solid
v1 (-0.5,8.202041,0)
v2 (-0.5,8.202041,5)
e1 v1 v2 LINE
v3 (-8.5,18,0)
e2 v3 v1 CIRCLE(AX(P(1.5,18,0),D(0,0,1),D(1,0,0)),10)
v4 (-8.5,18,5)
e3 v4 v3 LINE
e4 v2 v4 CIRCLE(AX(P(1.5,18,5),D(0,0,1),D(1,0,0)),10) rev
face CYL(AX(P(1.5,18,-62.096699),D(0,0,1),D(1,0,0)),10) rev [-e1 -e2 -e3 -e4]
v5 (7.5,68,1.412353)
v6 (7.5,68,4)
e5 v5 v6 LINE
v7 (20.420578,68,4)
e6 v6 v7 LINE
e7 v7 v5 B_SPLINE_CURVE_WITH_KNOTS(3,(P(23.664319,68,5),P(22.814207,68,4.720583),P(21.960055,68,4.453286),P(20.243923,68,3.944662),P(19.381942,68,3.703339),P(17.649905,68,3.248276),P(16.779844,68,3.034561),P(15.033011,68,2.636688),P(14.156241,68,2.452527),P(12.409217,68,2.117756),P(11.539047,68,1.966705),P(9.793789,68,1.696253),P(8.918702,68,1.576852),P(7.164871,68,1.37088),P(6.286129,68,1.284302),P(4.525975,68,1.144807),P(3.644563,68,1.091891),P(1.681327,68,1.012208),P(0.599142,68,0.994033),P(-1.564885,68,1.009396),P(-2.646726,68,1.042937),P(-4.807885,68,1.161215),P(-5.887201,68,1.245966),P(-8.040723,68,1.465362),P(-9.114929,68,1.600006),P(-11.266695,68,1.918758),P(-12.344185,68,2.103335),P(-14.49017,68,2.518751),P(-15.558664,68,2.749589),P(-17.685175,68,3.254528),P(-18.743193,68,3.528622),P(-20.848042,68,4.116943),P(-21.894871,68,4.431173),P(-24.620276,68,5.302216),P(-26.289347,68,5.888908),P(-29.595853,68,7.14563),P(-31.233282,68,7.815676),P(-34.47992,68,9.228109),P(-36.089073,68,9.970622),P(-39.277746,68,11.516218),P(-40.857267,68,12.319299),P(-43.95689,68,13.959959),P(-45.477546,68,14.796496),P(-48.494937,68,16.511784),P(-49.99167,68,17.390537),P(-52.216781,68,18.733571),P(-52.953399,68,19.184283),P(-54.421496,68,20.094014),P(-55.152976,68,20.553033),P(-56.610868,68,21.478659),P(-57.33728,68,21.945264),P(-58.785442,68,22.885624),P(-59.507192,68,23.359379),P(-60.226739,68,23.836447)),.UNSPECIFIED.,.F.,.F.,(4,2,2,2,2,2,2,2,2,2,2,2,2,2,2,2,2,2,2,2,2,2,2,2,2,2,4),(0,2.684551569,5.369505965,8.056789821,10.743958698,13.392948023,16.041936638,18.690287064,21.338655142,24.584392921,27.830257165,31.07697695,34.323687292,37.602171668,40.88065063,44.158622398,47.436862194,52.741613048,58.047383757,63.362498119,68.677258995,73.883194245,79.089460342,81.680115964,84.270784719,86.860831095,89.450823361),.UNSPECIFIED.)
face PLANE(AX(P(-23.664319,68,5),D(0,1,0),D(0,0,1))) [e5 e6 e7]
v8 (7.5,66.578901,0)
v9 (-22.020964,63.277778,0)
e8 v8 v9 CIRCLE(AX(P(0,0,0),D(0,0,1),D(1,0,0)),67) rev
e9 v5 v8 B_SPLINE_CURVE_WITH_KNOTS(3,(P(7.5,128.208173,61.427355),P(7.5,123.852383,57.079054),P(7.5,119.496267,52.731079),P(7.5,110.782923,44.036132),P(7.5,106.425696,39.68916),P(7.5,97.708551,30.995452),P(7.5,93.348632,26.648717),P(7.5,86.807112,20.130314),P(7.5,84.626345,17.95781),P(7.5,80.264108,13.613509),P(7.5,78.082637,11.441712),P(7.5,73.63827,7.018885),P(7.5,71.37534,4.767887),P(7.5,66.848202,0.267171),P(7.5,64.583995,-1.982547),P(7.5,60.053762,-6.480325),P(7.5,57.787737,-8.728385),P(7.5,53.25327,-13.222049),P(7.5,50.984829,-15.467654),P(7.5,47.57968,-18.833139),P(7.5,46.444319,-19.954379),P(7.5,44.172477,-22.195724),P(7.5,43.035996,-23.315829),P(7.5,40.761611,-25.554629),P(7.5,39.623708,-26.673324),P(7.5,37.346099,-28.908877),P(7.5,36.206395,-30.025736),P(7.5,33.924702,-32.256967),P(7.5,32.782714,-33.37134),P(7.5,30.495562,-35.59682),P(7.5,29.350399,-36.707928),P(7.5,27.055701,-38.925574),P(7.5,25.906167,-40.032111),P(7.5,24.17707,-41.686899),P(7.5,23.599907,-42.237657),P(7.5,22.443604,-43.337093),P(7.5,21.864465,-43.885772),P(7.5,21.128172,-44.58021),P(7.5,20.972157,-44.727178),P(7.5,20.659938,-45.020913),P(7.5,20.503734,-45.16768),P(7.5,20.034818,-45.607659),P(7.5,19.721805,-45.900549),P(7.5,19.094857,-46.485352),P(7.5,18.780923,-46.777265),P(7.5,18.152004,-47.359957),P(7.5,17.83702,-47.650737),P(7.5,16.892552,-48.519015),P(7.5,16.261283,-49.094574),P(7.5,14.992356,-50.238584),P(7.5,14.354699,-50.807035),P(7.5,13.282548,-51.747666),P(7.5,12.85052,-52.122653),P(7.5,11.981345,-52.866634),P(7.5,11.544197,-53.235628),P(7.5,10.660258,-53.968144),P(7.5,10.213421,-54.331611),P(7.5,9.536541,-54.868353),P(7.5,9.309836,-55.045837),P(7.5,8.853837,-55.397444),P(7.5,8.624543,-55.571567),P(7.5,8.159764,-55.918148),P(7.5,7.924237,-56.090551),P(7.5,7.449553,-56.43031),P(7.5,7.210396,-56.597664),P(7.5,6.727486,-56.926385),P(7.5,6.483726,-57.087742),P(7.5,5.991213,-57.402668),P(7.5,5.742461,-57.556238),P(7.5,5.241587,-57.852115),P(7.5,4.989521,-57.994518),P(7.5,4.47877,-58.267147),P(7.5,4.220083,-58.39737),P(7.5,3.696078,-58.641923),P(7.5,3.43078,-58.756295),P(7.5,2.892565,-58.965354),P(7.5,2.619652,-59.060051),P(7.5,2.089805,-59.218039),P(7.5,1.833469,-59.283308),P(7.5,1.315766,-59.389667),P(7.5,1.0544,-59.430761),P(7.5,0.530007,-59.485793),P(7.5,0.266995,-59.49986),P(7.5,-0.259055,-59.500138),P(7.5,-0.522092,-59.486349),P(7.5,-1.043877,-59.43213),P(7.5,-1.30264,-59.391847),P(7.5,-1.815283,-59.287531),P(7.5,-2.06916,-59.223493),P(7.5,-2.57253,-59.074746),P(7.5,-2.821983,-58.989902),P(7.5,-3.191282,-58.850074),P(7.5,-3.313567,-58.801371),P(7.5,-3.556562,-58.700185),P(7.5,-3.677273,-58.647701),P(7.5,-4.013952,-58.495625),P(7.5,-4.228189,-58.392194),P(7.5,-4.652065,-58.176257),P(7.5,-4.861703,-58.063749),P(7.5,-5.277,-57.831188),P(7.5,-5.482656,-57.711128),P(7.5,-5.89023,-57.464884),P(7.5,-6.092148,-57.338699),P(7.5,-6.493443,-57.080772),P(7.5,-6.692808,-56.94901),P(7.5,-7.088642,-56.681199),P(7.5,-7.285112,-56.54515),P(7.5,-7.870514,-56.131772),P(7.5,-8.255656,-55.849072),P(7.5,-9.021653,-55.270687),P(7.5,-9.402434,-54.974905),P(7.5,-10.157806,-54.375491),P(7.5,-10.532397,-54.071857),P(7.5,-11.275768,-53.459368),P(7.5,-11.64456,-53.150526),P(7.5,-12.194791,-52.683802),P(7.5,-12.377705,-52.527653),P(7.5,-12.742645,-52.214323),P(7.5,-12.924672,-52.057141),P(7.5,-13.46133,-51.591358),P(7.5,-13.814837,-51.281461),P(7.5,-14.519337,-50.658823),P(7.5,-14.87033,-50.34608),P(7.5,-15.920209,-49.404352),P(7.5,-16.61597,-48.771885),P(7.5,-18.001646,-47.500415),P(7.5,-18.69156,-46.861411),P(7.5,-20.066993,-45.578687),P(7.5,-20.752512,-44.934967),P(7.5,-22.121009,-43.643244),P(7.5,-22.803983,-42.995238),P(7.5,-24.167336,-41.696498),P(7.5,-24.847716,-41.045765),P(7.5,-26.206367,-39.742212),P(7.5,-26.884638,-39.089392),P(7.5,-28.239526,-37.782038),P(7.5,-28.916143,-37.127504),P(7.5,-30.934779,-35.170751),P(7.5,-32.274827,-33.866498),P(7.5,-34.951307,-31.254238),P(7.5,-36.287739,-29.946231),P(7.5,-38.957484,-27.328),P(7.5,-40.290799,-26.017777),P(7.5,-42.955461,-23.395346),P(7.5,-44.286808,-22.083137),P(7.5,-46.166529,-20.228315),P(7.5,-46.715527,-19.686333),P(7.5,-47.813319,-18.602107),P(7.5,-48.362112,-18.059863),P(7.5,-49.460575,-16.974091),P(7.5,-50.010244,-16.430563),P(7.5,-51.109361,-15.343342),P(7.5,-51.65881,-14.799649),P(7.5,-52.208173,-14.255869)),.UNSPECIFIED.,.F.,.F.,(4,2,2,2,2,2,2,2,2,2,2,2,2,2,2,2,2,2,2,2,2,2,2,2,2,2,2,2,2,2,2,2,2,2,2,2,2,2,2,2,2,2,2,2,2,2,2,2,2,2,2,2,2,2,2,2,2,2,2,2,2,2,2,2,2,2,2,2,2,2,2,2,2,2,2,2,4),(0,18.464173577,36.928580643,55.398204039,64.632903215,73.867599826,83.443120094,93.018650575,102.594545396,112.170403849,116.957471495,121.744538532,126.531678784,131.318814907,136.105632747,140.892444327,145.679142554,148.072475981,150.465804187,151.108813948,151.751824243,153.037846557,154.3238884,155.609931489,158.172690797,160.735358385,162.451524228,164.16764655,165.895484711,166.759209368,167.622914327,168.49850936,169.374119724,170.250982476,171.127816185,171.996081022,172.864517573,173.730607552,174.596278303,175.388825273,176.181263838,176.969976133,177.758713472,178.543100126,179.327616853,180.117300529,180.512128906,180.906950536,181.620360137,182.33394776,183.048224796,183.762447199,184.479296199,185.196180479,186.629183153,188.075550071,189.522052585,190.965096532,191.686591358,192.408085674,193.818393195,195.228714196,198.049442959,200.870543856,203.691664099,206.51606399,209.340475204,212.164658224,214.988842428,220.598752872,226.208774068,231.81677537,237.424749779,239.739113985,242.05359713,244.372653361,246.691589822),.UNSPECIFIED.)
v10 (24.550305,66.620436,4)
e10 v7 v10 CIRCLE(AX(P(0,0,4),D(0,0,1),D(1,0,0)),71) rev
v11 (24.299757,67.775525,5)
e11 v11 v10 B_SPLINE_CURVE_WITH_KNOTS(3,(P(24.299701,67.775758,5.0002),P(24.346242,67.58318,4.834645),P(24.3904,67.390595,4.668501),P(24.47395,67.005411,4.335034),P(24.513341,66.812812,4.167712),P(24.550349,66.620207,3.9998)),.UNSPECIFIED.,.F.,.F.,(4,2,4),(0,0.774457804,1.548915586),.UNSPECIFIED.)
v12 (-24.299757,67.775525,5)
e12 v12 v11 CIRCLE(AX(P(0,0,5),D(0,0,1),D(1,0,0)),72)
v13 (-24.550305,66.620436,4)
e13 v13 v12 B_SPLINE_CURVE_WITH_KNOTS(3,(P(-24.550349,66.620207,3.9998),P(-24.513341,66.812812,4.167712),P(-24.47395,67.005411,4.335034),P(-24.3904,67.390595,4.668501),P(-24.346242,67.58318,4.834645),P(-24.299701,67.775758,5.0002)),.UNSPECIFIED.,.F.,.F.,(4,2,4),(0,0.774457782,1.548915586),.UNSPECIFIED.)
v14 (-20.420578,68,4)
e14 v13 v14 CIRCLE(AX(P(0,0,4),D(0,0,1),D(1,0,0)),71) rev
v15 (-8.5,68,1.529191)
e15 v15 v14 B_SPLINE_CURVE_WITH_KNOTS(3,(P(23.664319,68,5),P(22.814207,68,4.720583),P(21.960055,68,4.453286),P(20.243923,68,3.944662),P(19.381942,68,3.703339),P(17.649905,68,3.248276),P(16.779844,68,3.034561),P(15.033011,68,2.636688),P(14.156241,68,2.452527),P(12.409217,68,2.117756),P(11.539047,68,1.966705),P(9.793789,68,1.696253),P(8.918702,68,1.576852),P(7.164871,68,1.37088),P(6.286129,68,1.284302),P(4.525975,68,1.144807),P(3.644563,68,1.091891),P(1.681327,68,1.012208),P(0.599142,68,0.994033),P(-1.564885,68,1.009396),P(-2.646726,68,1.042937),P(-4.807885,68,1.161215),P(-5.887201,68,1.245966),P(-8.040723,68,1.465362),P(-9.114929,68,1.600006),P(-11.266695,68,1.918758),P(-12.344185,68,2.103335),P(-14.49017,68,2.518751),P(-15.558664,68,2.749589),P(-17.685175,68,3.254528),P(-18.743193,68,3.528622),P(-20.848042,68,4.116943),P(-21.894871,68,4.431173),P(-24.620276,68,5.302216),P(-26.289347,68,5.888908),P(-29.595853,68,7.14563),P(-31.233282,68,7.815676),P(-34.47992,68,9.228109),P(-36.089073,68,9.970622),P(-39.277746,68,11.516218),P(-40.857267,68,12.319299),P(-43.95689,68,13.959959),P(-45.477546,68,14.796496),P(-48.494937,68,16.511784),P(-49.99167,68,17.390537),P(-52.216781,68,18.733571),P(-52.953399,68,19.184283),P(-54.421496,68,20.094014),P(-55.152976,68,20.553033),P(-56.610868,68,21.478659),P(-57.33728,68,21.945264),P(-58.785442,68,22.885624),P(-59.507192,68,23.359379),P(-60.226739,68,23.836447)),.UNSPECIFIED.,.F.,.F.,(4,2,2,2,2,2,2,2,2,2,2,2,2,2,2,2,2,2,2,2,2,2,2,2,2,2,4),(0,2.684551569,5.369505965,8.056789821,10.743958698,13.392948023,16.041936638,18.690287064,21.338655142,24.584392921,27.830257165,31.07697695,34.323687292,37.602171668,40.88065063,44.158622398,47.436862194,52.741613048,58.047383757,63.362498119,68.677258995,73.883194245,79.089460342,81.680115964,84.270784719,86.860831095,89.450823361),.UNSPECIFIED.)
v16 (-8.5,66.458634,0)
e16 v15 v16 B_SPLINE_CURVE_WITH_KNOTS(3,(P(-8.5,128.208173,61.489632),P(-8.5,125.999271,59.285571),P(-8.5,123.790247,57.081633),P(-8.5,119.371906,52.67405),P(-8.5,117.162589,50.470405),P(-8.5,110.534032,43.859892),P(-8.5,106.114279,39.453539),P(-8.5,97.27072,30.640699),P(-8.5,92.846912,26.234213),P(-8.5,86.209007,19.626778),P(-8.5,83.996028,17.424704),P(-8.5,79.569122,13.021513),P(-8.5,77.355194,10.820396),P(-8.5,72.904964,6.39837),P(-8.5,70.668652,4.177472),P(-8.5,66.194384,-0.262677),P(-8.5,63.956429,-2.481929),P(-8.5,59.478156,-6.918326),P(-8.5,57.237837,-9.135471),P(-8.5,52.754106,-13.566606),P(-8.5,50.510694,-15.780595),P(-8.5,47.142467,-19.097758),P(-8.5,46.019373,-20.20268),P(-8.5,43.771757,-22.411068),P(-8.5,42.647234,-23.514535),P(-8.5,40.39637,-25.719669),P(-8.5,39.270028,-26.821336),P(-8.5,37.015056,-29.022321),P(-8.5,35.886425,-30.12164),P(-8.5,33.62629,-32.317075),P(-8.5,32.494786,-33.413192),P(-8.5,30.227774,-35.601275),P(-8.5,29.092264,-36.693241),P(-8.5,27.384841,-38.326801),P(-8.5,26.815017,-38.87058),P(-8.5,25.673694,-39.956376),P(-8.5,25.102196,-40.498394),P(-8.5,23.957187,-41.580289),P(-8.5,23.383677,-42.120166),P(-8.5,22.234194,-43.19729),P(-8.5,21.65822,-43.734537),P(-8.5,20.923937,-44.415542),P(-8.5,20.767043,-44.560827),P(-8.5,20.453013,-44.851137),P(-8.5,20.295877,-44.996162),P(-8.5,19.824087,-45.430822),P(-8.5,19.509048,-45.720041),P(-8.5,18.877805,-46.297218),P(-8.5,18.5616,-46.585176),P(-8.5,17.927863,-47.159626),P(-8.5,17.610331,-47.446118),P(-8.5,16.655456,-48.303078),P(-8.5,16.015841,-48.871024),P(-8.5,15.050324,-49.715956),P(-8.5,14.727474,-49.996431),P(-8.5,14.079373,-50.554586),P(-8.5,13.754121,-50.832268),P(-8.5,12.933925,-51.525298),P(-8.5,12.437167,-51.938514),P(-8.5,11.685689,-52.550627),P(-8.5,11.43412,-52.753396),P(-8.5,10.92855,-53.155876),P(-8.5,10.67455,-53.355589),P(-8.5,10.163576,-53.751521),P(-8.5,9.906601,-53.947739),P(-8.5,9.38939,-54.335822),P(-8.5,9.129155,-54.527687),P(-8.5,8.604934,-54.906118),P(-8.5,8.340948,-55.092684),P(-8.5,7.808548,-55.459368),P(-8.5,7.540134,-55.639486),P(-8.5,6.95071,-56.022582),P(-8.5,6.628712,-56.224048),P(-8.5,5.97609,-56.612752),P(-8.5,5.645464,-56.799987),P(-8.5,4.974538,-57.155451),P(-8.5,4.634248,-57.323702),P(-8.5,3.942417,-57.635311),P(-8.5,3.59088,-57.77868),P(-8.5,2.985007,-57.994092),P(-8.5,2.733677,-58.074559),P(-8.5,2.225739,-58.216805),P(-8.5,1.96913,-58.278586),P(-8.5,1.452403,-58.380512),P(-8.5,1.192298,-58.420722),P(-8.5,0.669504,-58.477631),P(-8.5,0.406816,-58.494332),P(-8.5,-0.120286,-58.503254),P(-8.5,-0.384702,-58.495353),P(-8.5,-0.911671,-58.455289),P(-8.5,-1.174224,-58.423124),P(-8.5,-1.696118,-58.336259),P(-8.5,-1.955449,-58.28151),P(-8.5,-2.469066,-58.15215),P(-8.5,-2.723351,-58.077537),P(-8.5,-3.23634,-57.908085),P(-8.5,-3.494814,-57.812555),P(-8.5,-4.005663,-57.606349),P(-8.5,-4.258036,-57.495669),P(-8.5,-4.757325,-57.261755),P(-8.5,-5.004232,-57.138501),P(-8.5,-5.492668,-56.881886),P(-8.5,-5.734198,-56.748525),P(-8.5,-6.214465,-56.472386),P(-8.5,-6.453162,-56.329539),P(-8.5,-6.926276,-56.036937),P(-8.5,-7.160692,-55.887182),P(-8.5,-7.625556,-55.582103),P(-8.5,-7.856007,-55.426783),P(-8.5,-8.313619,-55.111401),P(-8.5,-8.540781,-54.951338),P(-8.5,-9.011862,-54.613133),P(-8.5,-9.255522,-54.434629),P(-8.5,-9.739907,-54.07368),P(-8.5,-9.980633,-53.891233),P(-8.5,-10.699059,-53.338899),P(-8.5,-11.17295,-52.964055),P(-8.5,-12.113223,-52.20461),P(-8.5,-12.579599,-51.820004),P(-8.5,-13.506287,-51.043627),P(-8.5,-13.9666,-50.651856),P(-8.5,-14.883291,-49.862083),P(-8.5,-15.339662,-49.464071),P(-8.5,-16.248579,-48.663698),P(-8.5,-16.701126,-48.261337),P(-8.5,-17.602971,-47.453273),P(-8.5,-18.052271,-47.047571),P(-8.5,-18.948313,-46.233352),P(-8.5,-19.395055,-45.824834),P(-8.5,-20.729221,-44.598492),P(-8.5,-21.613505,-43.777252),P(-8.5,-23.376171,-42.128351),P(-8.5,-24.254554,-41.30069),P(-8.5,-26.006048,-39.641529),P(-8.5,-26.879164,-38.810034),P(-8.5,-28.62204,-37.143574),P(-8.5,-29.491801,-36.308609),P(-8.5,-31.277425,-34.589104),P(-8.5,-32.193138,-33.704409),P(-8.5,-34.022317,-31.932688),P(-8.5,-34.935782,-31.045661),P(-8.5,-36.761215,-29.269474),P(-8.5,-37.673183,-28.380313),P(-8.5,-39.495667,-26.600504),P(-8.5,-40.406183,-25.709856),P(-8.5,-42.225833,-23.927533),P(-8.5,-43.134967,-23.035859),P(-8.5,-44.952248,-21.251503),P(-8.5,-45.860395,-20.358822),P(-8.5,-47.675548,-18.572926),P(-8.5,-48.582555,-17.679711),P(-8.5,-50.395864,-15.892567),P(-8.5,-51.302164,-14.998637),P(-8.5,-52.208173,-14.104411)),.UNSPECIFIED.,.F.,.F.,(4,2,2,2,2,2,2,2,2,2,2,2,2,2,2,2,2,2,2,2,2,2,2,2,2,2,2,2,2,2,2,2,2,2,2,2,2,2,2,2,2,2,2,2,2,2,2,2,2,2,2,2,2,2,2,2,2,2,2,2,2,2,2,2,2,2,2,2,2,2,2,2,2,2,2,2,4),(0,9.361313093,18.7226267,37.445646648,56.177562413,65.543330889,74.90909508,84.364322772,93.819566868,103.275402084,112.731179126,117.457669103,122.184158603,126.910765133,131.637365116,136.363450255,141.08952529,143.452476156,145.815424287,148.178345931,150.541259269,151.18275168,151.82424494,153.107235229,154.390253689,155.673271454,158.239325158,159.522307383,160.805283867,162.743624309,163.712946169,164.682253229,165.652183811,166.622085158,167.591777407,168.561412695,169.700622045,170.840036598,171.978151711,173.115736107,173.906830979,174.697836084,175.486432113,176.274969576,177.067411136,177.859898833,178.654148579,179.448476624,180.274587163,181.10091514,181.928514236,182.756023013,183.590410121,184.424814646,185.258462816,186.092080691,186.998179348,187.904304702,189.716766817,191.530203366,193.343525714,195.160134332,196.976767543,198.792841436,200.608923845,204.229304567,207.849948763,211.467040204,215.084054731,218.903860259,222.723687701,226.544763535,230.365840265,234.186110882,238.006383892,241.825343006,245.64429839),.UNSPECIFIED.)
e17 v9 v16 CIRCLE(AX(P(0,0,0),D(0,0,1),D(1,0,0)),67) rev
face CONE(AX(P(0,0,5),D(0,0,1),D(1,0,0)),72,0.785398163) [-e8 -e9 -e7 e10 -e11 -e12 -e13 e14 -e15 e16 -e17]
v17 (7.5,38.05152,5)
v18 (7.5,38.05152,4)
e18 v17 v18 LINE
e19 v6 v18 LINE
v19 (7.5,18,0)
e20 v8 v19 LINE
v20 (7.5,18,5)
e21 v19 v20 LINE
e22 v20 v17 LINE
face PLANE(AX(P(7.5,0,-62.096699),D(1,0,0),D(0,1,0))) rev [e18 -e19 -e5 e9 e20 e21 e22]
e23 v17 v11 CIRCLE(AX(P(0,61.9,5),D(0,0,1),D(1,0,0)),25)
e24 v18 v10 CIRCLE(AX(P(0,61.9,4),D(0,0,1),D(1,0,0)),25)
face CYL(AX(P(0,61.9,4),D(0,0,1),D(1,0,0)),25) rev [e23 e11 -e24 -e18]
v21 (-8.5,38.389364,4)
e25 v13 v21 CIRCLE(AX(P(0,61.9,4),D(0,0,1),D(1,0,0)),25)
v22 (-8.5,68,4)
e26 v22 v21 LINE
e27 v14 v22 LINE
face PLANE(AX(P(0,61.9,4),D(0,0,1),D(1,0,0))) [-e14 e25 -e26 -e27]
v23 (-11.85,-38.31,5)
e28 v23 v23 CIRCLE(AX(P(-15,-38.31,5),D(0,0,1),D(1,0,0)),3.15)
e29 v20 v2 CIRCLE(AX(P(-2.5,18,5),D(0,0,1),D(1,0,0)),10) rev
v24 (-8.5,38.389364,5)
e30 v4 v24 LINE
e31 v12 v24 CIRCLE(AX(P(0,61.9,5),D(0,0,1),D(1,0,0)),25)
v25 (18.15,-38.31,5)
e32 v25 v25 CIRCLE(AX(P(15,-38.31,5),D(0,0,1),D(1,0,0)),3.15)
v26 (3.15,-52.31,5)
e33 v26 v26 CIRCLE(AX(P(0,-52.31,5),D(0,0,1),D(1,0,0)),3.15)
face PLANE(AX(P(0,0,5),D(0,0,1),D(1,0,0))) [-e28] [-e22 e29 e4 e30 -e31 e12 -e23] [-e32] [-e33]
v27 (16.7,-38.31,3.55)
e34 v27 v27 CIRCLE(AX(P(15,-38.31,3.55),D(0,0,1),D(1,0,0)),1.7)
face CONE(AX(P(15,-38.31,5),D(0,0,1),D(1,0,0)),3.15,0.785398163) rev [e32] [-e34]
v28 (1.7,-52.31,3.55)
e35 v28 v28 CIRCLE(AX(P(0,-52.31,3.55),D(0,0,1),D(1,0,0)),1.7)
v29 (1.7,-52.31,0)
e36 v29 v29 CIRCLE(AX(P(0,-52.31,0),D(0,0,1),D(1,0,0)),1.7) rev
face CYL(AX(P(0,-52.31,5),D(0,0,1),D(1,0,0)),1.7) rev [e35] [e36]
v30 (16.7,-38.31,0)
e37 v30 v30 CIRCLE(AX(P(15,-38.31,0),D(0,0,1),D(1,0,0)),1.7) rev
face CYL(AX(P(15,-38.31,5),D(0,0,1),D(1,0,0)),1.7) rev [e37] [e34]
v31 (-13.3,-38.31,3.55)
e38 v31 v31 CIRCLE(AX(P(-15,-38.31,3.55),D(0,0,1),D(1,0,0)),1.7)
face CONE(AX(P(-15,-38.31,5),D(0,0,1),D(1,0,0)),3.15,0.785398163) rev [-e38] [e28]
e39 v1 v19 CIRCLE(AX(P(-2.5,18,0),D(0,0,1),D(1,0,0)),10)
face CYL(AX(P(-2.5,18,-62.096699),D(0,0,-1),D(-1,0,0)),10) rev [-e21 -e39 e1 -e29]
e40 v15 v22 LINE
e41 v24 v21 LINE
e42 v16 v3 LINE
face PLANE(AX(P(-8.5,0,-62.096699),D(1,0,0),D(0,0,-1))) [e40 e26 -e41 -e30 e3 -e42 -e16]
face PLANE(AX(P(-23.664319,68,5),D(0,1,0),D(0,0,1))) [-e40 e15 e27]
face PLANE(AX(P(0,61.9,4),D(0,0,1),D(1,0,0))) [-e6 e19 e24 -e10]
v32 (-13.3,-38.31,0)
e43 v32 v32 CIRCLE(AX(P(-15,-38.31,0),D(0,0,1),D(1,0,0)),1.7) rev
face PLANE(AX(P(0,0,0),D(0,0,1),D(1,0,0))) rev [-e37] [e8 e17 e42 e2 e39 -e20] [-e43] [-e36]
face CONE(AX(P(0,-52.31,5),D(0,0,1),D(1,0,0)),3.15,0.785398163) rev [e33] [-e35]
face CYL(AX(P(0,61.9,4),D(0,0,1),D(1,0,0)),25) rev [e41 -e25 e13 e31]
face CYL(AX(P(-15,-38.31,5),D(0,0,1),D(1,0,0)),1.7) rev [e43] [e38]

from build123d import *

# Parameters (mm, degrees)
BOSS_EXTRUDE2_DEPTH                                 = 5
CSK_FOR_M3_COUNTERSUNK_FLAT_HEAD_SCREW1_D           = 3.4
CSK_FOR_M3_COUNTERSUNK_FLAT_HEAD_SCREW1_DEPTH       = 5
CSK_FOR_M3_COUNTERSUNK_FLAT_HEAD_SCREW1_CSINK_D     = 6.3
CSK_FOR_M3_COUNTERSUNK_FLAT_HEAD_SCREW1_CSINK_ANGLE = 90
CSK_FOR_M3_COUNTERSUNK_FLAT_HEAD_SCREW1_TIP         = 1.021463052
CUT_EXTRUDE1_REACH                                  = 103.946
SKETCH4_W                                           = 16
SKETCH4_H                                           = 60
SKETCH5_R                                           = 25
CUT_EXTRUDE2_DEPTH                                  = 1
FILLET1_R                                           = 10


with BuildPart() as part:
    # Sketch1 → Boss-Extrude2 (new body)
    with BuildSketch(Plane.XY):
        with BuildLine():
            Line((-23.664319132, 68), (23.664319132, 68))
            ThreePointArc((23.664319132, 68), (0, -72), (-23.664319132, 68))
        make_face()
    extrude(amount=BOSS_EXTRUDE2_DEPTH)

    # Chamfer1: read off the stored shape, not the designer's step
    # Chamfer1 outline → Chamfer1 (revolve, cut)
    with BuildSketch(Plane.XZ):
        Polygon((72.000000172, 5.000000172), (67, 0), (72.000000172, 0), align=None)
    revolve(axis=Axis((0, 0, 0), (0, 0, 1)), mode=Mode.SUBTRACT)

    # CSK for M3 Countersunk Flat Head Screw1
    with Locations(Plane.XY.offset(5)):
        with Locations((15, -38.31), (-15, -38.31), (0, -52.31)):
            CounterSinkHole(CSK_FOR_M3_COUNTERSUNK_FLAT_HEAD_SCREW1_D / 2, CSK_FOR_M3_COUNTERSUNK_FLAT_HEAD_SCREW1_CSINK_D / 2, depth=CSK_FOR_M3_COUNTERSUNK_FLAT_HEAD_SCREW1_DEPTH, counter_sink_angle=CSK_FOR_M3_COUNTERSUNK_FLAT_HEAD_SCREW1_CSINK_ANGLE)
            with Locations((0, 0, -(CSK_FOR_M3_COUNTERSUNK_FLAT_HEAD_SCREW1_DEPTH + CSK_FOR_M3_COUNTERSUNK_FLAT_HEAD_SCREW1_TIP / 2))):  # 118° drill point
                Cone(0, CSK_FOR_M3_COUNTERSUNK_FLAT_HEAD_SCREW1_D / 2, CSK_FOR_M3_COUNTERSUNK_FLAT_HEAD_SCREW1_TIP, mode=Mode.SUBTRACT)

    # Cut-Extrude1: up to this face of the body (flat: up to its plane)
    cut_extrude1_end = Plane(part.part.faces().sort_by_distance((0, 0.083165236, 0))[0])
    # Sketch4 → Cut-Extrude1 (cut, up to the picked face)
    with BuildSketch(Plane.XY.offset(5), mode=Mode.PRIVATE) as cut_extrude1_sk1:
        with Locations((-0.5, 38)):
            Rectangle(SKETCH4_W, SKETCH4_H)
    cut_extrude1_tool1 = split(extrude(cut_extrude1_sk1.sketch, amount=-CUT_EXTRUDE1_REACH, mode=Mode.PRIVATE), bisect_by=cut_extrude1_end, keep=Keep.BOTH, mode=Mode.PRIVATE)
    add(cut_extrude1_tool1.solids().sort_by(Axis((-0.5, 38, 5), (0, 0, -1)))[0], mode=Mode.SUBTRACT)

    # Sketch5 → Cut-Extrude2 (cut)
    with BuildSketch(Plane.XY.offset(5)):
        with Locations((0, 61.9)):
            Circle(SKETCH5_R)
    extrude(amount=-CUT_EXTRUDE2_DEPTH, mode=Mode.SUBTRACT)

    # Fillet1
    # the kernel refuses this fillet: 10 mm, written as the material it adds along each edge
    with BuildSketch(Plane(origin=(-8.5, 8, 5), x_dir=(1, 0, 0), z_dir=(0, 0, -1)), Plane(origin=(7.5, 8, 5), x_dir=(0, 1, 0), z_dir=(0, 0, -1))) as fillet1_piece_1:
        with BuildLine():
            CenterArc((FILLET1_R, -FILLET1_R), FILLET1_R, 90, 90)
            Line((0, -FILLET1_R), (0, 0))
            Line((0, 0), (FILLET1_R, 0))
        make_face()
    extrude(amount=5)


solid = part.part
